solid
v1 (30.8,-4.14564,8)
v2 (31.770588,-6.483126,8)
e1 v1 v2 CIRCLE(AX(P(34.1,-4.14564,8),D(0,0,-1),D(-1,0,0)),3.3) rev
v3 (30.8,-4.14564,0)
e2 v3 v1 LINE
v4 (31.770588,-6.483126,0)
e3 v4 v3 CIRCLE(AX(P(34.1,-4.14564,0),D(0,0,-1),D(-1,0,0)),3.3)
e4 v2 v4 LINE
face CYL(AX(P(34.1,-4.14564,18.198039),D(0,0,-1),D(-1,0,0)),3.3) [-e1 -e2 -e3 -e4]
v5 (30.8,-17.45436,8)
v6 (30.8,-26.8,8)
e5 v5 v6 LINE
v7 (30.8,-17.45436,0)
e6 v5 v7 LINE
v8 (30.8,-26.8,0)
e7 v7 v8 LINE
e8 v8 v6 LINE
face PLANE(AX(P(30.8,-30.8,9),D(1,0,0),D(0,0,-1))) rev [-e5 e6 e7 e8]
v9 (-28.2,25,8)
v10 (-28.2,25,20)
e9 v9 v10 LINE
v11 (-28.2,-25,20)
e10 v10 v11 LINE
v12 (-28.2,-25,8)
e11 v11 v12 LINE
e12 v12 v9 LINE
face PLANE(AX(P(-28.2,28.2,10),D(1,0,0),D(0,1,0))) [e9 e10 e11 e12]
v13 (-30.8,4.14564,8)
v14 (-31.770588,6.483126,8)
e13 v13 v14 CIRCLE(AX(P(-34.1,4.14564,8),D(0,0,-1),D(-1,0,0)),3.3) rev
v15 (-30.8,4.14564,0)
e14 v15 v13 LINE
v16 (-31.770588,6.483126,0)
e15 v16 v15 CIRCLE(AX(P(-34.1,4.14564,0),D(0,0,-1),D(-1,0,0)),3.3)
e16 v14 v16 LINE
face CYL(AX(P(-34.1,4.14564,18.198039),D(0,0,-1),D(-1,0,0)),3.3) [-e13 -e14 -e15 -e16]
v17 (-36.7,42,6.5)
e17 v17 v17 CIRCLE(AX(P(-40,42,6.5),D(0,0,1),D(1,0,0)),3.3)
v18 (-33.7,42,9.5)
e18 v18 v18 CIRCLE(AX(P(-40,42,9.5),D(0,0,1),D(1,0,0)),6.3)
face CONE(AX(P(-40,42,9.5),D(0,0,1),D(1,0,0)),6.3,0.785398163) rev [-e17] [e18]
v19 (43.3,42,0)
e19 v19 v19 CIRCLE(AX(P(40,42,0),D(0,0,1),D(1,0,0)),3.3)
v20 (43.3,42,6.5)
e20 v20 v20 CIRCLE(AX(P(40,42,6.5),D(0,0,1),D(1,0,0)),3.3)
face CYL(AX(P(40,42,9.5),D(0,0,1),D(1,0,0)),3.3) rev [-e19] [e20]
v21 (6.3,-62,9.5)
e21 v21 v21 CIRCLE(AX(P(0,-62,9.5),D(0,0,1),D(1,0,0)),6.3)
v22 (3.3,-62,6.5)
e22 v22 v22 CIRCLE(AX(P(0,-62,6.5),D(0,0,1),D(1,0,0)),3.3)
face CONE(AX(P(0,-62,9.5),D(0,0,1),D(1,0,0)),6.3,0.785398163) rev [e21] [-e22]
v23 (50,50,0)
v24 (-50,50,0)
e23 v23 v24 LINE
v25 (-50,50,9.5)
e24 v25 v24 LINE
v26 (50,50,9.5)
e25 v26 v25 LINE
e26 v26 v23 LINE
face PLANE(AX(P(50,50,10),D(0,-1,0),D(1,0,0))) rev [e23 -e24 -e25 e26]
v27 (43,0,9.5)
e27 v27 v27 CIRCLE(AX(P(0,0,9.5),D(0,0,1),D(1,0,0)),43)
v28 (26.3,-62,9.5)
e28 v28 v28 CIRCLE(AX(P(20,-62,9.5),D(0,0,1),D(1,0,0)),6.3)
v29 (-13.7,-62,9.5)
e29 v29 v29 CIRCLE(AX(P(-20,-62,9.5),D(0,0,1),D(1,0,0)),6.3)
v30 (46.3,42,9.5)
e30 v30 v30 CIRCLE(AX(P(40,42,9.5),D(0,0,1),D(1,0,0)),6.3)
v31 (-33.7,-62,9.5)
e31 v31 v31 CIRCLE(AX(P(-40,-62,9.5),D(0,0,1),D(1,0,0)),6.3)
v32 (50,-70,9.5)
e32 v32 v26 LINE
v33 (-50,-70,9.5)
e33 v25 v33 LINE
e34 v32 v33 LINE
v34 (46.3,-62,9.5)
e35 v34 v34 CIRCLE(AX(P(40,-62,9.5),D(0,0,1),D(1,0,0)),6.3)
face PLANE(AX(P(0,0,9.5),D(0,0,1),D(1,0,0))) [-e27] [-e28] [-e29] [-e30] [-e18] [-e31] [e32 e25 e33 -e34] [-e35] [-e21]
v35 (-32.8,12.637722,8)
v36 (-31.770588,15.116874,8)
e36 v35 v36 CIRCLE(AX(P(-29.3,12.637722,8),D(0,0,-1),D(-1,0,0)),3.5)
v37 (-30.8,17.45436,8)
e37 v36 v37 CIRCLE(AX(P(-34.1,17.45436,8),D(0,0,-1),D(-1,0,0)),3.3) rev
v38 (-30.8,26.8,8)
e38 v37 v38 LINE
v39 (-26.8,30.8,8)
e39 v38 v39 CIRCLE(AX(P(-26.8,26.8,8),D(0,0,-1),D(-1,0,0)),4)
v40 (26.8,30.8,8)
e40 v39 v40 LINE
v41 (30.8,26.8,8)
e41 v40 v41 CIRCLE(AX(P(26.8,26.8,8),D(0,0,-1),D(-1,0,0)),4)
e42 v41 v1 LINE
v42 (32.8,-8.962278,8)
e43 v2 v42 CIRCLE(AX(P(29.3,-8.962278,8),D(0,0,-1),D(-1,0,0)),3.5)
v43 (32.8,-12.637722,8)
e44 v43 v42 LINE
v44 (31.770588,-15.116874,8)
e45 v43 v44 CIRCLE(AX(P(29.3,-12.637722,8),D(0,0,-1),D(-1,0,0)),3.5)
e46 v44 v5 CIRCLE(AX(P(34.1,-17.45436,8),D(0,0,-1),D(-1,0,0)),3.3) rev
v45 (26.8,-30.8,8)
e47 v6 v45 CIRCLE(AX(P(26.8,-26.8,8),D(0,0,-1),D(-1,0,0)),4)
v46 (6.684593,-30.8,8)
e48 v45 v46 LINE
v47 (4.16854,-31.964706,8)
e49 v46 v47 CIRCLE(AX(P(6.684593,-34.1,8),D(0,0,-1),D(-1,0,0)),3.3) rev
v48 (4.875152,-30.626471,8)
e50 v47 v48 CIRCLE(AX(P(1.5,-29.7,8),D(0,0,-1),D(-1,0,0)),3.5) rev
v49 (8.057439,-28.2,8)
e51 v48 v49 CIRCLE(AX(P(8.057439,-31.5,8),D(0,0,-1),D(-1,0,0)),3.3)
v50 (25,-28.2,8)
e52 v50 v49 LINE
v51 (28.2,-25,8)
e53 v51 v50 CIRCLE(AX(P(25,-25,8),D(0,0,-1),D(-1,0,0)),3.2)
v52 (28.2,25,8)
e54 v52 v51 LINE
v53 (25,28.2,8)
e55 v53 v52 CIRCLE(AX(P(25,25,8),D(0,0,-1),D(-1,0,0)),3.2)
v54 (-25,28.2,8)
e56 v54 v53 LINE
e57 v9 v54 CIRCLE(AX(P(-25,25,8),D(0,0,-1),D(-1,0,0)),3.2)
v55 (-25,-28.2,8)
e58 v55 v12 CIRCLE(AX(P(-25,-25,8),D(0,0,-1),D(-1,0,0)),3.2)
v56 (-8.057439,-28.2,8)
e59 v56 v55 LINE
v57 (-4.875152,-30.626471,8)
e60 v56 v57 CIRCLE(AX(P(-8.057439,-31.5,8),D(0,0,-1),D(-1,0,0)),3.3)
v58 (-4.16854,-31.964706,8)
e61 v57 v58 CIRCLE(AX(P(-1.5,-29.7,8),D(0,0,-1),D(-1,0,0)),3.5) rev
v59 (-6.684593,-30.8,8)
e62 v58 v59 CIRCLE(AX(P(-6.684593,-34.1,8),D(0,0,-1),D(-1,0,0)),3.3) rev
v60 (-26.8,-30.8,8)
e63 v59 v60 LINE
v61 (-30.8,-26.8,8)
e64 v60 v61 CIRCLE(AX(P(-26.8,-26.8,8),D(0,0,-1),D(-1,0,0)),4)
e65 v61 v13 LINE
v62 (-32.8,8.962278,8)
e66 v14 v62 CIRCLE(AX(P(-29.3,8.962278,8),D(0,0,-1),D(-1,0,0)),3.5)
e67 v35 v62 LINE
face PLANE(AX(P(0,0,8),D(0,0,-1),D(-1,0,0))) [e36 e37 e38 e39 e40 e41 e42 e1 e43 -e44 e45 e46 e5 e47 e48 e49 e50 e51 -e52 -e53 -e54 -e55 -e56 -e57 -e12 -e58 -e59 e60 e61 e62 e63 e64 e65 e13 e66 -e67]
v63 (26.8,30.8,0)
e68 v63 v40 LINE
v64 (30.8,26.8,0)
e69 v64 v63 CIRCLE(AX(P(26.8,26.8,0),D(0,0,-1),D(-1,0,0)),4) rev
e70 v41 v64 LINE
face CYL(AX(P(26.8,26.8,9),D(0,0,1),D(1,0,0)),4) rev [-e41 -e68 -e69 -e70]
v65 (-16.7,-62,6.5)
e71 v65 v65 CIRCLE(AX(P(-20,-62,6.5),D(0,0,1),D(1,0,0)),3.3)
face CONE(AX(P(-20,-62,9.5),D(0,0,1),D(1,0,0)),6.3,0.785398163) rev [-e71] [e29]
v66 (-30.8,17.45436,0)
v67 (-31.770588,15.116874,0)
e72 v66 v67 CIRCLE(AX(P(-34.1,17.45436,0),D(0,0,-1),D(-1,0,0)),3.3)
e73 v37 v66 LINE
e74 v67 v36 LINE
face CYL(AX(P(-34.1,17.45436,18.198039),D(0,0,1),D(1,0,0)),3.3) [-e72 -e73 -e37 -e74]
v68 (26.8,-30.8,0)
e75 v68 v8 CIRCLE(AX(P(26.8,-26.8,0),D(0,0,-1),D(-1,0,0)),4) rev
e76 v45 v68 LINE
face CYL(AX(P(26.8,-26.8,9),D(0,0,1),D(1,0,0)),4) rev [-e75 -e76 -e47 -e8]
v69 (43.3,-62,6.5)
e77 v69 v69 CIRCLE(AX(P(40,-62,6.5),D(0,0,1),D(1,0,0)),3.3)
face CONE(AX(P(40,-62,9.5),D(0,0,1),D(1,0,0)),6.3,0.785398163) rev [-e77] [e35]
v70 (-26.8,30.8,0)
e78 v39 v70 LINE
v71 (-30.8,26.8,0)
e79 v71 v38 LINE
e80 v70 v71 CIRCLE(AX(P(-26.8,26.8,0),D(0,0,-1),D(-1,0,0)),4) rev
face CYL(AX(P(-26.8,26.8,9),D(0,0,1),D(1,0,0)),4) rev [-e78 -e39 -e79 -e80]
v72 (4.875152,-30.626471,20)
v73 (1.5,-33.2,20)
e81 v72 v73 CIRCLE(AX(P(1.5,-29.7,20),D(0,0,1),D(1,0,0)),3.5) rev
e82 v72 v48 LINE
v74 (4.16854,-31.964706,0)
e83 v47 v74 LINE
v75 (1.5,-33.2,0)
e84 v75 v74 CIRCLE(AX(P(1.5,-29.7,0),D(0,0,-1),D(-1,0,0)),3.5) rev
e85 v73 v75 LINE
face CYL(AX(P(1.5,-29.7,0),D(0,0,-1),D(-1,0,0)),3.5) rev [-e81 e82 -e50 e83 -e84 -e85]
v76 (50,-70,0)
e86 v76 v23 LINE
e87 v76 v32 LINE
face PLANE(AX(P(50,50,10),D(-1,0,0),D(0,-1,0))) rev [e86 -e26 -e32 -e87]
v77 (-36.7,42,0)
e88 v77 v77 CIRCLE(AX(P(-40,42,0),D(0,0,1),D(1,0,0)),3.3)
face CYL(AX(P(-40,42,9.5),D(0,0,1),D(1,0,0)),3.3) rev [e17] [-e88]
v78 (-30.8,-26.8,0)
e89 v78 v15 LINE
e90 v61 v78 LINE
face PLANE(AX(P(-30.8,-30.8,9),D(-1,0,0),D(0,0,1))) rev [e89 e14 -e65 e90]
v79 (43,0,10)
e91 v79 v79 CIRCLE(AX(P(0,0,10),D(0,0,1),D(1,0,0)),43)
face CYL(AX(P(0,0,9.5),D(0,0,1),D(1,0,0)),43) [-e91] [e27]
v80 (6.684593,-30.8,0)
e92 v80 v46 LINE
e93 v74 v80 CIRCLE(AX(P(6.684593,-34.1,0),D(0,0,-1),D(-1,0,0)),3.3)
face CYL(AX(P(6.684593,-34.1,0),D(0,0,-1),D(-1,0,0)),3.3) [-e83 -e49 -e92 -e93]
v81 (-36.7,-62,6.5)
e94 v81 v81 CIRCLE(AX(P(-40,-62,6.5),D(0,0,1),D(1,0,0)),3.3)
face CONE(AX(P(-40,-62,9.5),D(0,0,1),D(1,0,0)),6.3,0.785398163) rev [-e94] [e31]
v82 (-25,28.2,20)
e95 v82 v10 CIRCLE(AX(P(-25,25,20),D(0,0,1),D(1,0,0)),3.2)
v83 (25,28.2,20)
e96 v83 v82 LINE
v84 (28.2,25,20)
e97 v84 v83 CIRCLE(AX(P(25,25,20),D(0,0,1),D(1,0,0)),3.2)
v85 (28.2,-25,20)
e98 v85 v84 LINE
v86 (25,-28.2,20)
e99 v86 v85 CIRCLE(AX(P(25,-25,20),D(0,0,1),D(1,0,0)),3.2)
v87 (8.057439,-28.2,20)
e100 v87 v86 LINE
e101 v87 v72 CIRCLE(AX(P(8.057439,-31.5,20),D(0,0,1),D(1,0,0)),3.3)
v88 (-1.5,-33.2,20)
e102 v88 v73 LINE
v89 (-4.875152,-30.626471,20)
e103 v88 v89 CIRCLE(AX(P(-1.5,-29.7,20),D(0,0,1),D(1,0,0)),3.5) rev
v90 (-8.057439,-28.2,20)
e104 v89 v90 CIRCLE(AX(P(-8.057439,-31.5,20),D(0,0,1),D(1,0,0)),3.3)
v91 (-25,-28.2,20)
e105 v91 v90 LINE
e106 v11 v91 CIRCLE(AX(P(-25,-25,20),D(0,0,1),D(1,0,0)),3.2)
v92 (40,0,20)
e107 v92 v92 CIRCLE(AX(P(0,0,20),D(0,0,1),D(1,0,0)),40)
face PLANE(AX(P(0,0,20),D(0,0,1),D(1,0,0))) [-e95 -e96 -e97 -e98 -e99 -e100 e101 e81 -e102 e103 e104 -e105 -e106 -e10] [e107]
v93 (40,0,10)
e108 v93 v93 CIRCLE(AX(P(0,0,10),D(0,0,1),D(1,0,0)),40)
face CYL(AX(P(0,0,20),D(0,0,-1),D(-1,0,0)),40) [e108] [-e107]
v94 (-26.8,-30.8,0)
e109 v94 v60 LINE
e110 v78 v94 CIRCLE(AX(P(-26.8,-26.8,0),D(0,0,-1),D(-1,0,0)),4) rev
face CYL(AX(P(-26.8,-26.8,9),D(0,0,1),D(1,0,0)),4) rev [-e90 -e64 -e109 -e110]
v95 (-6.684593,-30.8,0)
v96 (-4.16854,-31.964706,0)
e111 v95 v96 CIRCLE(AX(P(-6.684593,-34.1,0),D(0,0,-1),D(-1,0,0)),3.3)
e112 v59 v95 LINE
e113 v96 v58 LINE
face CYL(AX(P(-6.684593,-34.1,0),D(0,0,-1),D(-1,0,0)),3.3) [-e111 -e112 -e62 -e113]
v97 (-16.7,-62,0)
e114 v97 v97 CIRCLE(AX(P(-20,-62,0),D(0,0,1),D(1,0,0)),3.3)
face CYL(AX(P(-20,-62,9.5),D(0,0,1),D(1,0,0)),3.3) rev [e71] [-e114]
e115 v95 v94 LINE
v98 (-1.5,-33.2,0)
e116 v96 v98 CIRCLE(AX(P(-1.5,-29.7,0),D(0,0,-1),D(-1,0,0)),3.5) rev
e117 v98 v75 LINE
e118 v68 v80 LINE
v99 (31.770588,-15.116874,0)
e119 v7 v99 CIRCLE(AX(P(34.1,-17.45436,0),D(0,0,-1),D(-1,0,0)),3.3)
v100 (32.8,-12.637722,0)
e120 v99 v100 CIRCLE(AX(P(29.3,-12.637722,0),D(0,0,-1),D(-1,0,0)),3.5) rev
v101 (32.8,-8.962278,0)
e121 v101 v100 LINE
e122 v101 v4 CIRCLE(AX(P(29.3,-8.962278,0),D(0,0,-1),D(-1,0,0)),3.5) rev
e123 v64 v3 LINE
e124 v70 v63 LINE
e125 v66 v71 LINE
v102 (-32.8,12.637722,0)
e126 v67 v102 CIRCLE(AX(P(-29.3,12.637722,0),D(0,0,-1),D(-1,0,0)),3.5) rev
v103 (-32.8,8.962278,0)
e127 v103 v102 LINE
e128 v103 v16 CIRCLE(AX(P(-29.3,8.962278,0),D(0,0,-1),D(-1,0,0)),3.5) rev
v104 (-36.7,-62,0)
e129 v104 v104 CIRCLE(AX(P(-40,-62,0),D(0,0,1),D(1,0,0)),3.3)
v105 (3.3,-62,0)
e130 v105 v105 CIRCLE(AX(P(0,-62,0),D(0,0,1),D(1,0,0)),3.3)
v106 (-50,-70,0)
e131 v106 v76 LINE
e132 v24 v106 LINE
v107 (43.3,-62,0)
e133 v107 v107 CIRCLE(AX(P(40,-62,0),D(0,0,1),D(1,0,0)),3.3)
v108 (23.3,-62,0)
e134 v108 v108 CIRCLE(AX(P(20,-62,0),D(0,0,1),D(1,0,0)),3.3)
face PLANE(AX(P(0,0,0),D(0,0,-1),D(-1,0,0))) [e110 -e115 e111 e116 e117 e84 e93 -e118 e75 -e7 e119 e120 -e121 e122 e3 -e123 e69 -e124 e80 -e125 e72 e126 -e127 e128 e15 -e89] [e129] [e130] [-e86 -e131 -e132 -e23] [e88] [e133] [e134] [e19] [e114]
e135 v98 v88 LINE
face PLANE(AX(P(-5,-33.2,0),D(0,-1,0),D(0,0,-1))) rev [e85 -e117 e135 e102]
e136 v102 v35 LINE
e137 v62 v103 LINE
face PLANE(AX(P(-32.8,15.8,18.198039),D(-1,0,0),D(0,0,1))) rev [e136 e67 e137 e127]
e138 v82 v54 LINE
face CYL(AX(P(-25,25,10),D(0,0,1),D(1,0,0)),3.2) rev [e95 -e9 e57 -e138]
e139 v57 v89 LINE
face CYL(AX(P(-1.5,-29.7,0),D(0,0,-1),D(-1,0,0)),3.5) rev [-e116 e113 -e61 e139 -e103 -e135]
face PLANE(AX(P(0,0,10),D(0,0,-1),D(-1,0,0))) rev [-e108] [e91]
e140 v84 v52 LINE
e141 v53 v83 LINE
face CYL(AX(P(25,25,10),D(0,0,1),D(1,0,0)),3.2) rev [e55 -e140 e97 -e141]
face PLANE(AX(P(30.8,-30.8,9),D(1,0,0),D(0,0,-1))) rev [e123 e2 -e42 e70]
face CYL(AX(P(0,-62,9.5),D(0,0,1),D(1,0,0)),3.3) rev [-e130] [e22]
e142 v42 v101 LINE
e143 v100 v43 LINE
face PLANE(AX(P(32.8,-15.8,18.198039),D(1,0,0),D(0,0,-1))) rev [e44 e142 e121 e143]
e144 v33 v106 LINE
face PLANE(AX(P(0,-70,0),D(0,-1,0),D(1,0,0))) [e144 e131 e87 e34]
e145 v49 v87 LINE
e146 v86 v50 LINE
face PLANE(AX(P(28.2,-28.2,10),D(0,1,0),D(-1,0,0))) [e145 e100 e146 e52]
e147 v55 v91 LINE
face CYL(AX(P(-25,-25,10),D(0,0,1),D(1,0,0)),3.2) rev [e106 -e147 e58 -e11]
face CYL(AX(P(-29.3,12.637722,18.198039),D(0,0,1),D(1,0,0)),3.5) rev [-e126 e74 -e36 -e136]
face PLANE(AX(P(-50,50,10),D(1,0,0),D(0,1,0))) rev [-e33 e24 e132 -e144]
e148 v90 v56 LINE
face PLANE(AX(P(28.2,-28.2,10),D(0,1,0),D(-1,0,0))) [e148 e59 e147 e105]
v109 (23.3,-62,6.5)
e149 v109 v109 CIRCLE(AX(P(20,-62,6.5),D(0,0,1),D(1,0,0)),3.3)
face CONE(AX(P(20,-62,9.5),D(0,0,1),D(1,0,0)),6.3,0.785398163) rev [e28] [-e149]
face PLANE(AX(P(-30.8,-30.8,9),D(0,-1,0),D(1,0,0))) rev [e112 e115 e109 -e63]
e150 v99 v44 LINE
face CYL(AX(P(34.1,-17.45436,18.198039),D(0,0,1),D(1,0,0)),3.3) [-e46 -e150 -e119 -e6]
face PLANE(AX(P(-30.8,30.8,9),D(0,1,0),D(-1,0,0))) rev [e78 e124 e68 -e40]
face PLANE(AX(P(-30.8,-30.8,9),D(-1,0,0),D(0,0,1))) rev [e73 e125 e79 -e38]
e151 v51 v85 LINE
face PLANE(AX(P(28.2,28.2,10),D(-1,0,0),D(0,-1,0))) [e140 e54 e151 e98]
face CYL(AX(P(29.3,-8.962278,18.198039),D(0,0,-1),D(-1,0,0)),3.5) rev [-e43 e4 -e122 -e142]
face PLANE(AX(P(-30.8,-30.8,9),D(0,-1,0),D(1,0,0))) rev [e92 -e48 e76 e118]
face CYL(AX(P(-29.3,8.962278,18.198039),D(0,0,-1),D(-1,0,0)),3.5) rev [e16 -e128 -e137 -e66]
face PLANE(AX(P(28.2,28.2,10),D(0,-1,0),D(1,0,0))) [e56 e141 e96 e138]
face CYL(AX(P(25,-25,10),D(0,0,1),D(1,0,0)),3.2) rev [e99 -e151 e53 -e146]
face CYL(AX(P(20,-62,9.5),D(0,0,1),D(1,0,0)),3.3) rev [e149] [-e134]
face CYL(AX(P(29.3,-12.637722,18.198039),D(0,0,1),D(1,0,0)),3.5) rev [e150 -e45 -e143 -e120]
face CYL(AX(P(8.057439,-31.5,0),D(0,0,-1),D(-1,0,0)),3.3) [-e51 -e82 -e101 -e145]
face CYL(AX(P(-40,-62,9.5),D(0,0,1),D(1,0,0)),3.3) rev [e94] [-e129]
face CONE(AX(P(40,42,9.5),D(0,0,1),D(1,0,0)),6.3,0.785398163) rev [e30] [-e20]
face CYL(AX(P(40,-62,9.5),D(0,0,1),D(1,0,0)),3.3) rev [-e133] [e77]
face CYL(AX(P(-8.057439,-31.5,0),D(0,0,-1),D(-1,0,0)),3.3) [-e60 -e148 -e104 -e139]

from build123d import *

# Parameters (mm, degrees)
ESQUISSE1_W                                    = 100
ESQUISSE1_H                                    = 100
ESQUISSE1_W_2                                  = 56.4
ESQUISSE1_H_2                                  = 56.4
BOSS_EXTRU_1_DEPTH                             = 10
CONG_1_R                                       = 3.2
BOSS_EXTRU_2_START                             = 10
ESQUISSE3_R                                    = 40
BOSS_EXTRU_2_DEPTH                             = 10
ESQUISSE4_OUTSIDE_W                            = 130.566
ESQUISSE4_OUTSIDE_H                            = 130.566
ESQUISSE4_OUTSIDE_R                            = 43
ENL_V_MAT_EXTRU_2_DEPTH                        = 0.5
ESQUISSE5_W                                    = 61.6
ESQUISSE5_H                                    = 61.6
ENL_V_MAT_EXTRU_3_DEPTH                        = 9
ESQUISSE6_W                                    = 61.6
ESQUISSE6_H                                    = 61.6
BOSS_EXTRU_3_DEPTH                             = 1
ESQUISSE12_W                                   = 100
ESQUISSE12_H                                   = 9.5
BOSS_EXTRU_5_DEPTH                             = 20
FRAISAGE_POUR_VIS_T_TE_FRAIS_E_M61_D           = 6.6
FRAISAGE_POUR_VIS_T_TE_FRAIS_E_M61_CSINK_D     = 12.6
FRAISAGE_POUR_VIS_T_TE_FRAIS_E_M61_CSINK_ANGLE = 90
ESQUISSE16_W                                   = 2
ESQUISSE16_H                                   = 10
ENL_V_MAT_EXTRU_4_DEPTH                        = 8
CONG_3_R                                       = 3.5
ESQUISSE17_W                                   = 10
ESQUISSE17_H                                   = 5
ENL_V_MAT_EXTRU_5_DEPTH                        = 89.317608663
CONG_4_R                                       = 3.5
CONG_5_R                                       = 3.3
CONG_6_R                                       = 4


with BuildPart() as part:
    # Esquisse1 → Boss.-Extru.1 (new body)
    with BuildSketch(Plane.XY):
        Rectangle(ESQUISSE1_W, ESQUISSE1_H)
        Rectangle(ESQUISSE1_W_2, ESQUISSE1_H_2, mode=Mode.SUBTRACT)
    extrude(amount=BOSS_EXTRU_1_DEPTH)

    # Congé1
    cong_1_edges = [part.edges().sort_by_distance(p)[0] for p in [
        (-28.2, 28.2, 5),
        (-28.2, -28.2, 5),
        (28.2, -28.2, 5),
        (28.2, 28.2, 5),
    ]]
    fillet(cong_1_edges, radius=CONG_1_R)

    # Esquisse3 → Boss.-Extru.2 (add)
    with BuildSketch(Plane.XY.offset(10).offset(BOSS_EXTRU_2_START)):
        Circle(ESQUISSE3_R)
        with BuildLine():
            Line((-28.2, 25), (-28.2, -25))
            ThreePointArc((-28.2, -25), (-27.2627417, -27.2627417), (-25, -28.2))
            Line((-25, -28.2), (25, -28.2))
            ThreePointArc((25, -28.2), (27.2627417, -27.2627417), (28.2, -25))
            Line((28.2, -25), (28.2, 25))
            ThreePointArc((28.2, 25), (27.2627417, 27.2627417), (25, 28.2))
            Line((25, 28.2), (-25, 28.2))
            ThreePointArc((-25, 28.2), (-27.2627417, 27.2627417), (-28.2, 25))
        make_face(mode=Mode.SUBTRACT)
    extrude(amount=-BOSS_EXTRU_2_DEPTH)

    # Esquisse4 outside → Enlèv. mat.-Extru.2 (cut)
    with BuildSketch(Plane.XY.offset(10)):
        Rectangle(ESQUISSE4_OUTSIDE_W, ESQUISSE4_OUTSIDE_H)
        Circle(ESQUISSE4_OUTSIDE_R, mode=Mode.SUBTRACT)
    extrude(amount=-ENL_V_MAT_EXTRU_2_DEPTH, mode=Mode.SUBTRACT)

    # Esquisse5 → Enlèv. mat.-Extru.3 (cut)
    with BuildSketch(Plane(origin=(0, 0, 0), x_dir=(-1, 0, 0), z_dir=(0, 0, -1))):
        Rectangle(ESQUISSE5_W, ESQUISSE5_H)
    extrude(amount=-ENL_V_MAT_EXTRU_3_DEPTH, mode=Mode.SUBTRACT)

    # Esquisse6 → Boss.-Extru.3 (add)
    with BuildSketch(Plane(origin=(0, 0, 9), x_dir=(-1, 0, 0), z_dir=(0, 0, -1))):
        Rectangle(ESQUISSE6_W, ESQUISSE6_H)
        with BuildLine():
            Line((28.2, -25), (28.2, 25))
            ThreePointArc((28.2, 25), (27.2627417, 27.2627417), (25, 28.2))
            Line((25, 28.2), (-25, 28.2))
            ThreePointArc((-25, 28.2), (-27.2627417, 27.2627417), (-28.2, 25))
            Line((-28.2, 25), (-28.2, -25))
            ThreePointArc((-28.2, -25), (-27.2627417, -27.2627417), (-25, -28.2))
            Line((-25, -28.2), (25, -28.2))
            ThreePointArc((25, -28.2), (27.2627417, -27.2627417), (28.2, -25))
        make_face(mode=Mode.SUBTRACT)
    extrude(amount=BOSS_EXTRU_3_DEPTH)

    # Esquisse12 → Boss.-Extru.5 (add)
    with BuildSketch(Plane.XZ.offset(50)):
        with Locations((0, 4.75)):
            Rectangle(ESQUISSE12_W, ESQUISSE12_H)
    extrude(amount=BOSS_EXTRU_5_DEPTH)

    # Fraisage pour vis à tête fraisée M61 (through all)
    with Locations(Plane(origin=(-40, -62, 9.5), x_dir=(1, 0, 0), z_dir=(0, 0, 1))):
        with Locations((0, 0), (20, 0), (40, 0), (60, 0), (80, 0), (0, 104), (80, 104)):
            CounterSinkHole(FRAISAGE_POUR_VIS_T_TE_FRAIS_E_M61_D / 2, FRAISAGE_POUR_VIS_T_TE_FRAIS_E_M61_CSINK_D / 2, counter_sink_angle=FRAISAGE_POUR_VIS_T_TE_FRAIS_E_M61_CSINK_ANGLE)

    # Esquisse16 → Enlèv. mat.-Extru.4 (cut)
    with BuildSketch(Plane(origin=(0, 0, 0), x_dir=(-1, 0, 0), z_dir=(0, 0, -1))):
        with Locations((31.8, 10.8)):
            Rectangle(ESQUISSE16_W, ESQUISSE16_H)
        with Locations((-31.8, -10.8)):
            Rectangle(ESQUISSE16_W, ESQUISSE16_H)
    extrude(amount=-ENL_V_MAT_EXTRU_4_DEPTH, mode=Mode.SUBTRACT)

    # Congé3
    # the kernel refuses this fillet: 3.5 mm, written as the material it adds along each edge
    with BuildSketch(Plane(origin=(32.8, -5.8, 0), x_dir=(-1, 0, 0), z_dir=(0, 0, 1)), Plane(origin=(-32.8, 5.8, 0), x_dir=(1, 0, 0), z_dir=(0, 0, 1))) as cong_3_piece_1:
        with BuildLine():
            CenterArc((3.5, 3.16227766), CONG_3_R, 180, 64.623066475)
            Line((0, 3.16227766), (-0.07, 3.16227766))
            Line((-0.07, 3.16227766), (-0.07, 0))
            Line((-0.07, 0), (0, -0.07))
            ThreePointArc((0, -0.07), (1, -0.07), (1.97, -0.063245553))
            Line((1.97, -0.063245553), (2, 0))
        make_face()
    extrude(amount=15.90569415)
    with BuildSketch(Plane(origin=(32.8, -15.8, 0), x_dir=(-1, 0, 0), z_dir=(0, 0, 1)), Plane(origin=(-32.8, 15.8, 0), x_dir=(1, 0, 0), z_dir=(0, 0, 1))) as cong_3_piece_2:
        with BuildLine():
            CenterArc((3.5, -3.16227766), CONG_3_R, 115.376933525, 64.623066475)
            Line((0, -3.16227766), (-0.07, -3.16227766))
            Line((-0.07, -3.16227766), (-0.07, 0))
            Line((-0.07, 0), (0, 0.07))
            ThreePointArc((0, 0.07), (1, 0.07), (1.97, 0.063245553))
            Line((1.97, 0.063245553), (2, 0))
        make_face()
    extrude(amount=15.90569415)

    # Esquisse17 → Enlèv. mat.-Extru.5 (cut, through all)
    with BuildSketch(Plane.XY.offset(20)):
        with Locations((0, -30.7)):
            Rectangle(ESQUISSE17_W, ESQUISSE17_H)
    extrude(amount=-ENL_V_MAT_EXTRU_5_DEPTH, mode=Mode.SUBTRACT)

    # Congé4
    cong_4_edges = [part.edges().sort_by_distance(p)[0] for p in [
        (5, -33.2, 10),
        (-5, -33.2, 10),
    ]]
    fillet(cong_4_edges, radius=CONG_4_R)

    # Congé5
    # the kernel refuses this fillet: 3.3 mm, written as the material it takes off along each edge
    with BuildSketch(Plane(origin=(-30.8, 5.8, -4.135900428), x_dir=(0, -1, 0), z_dir=(0, 0, 1))) as cong_5_piece_1:
        with BuildLine():
            CenterArc((1.654360171, -3.3), CONG_5_R, 90, 45.099127844)
            ThreePointArc((-0.683125835, -0.970588235), (-0.300120774, -0.514462201), (0, 0))
            Line((0, 0), (1.654360171, 0))
        make_face()
    extrude(amount=12.135900428, mode=Mode.SUBTRACT)
    with BuildSketch(Plane(origin=(-30.8, 15.8, -4.135900428), x_dir=(0, 1, 0), z_dir=(0, 0, 1)), Plane(origin=(30.8, -15.8, -4.135900428), x_dir=(0, -1, 0), z_dir=(0, 0, 1))) as cong_5_piece_2:
        with BuildLine():
            CenterArc((1.654360171, 3.3), CONG_5_R, 224.900872156, 45.099127844)
            ThreePointArc((-0.683125835, 0.970588235), (-0.300120774, 0.514462201), (0, 0))
            Line((0, 0), (1.654360171, 0))
        make_face()
    extrude(amount=12.135900428, mode=Mode.SUBTRACT)
    with BuildSketch(Plane(origin=(30.8, -5.8, -4.135900428), x_dir=(0.8177591102711759, -0.5755606289249594, 0), z_dir=(0, 0, 1))) as cong_5_piece_3:
        with BuildLine():
            CenterArc((1.746420483, 3.252218177), CONG_5_R, 215.138902841, 45.099127844)
            Line((-0.952184581, 1.352868102), (0, 0))
            ThreePointArc((0, 0), (0.593443854, 0.050677691), (1.186887707, 0))
        make_face()
    extrude(amount=12.135900428, mode=Mode.SUBTRACT)
    with BuildSketch(Plane(origin=(5, -28.2, 27.643596311), x_dir=(-0.0513844627897584, -0.9986789458999363, 0), z_dir=(0, 0, -1))) as cong_5_piece_4:
        with BuildLine():
            CenterArc((3.138535685, -3.22296821), CONG_5_R, 102.404067037, 74.650522983)
            Line((-0.157104836, -3.053399483), (-0.486668888, -3.03644261))
            Line((-0.486668888, -3.03644261), (-0.329564052, 0.016956873))
            Line((-0.329564052, 0.016956873), (0.016956873, 0.329564052))
            ThreePointArc((0.016956873, 0.329564052), (1.514975292, 0.252487358), (2.358794792, 0.322296821))
            Line((2.358794792, 0.322296821), (2.429680327, 0))
        make_face()
    extrude(amount=27.287192622, mode=Mode.SUBTRACT)
    with BuildSketch(Plane(origin=(-5, -28.2, 27.643596311), x_dir=(0.05138446278975914, -0.9986789458999363, 0), z_dir=(0, 0, -1))) as cong_5_piece_5:
        with BuildLine():
            CenterArc((3.138535685, 3.22296821), CONG_5_R, 182.94540998, 74.650522983)
            Line((-0.157104836, 3.053399483), (-0.486668888, 3.03644261))
            Line((-0.486668888, 3.03644261), (-0.329564052, -0.016956873))
            Line((-0.329564052, -0.016956873), (0.016956873, -0.329564052))
            ThreePointArc((0.016956873, -0.329564052), (1.514975292, -0.252487358), (2.358794792, -0.322296821))
            Line((2.358794792, -0.322296821), (2.429680327, 0))
        make_face()
    extrude(amount=27.287192622, mode=Mode.SUBTRACT)
    with BuildSketch(Plane(origin=(4.822649545, -30.8, 8), x_dir=(1, 0, 0), z_dir=(0, 0, -1))) as cong_5_piece_6:
        with BuildLine():
            CenterArc((1.861943014, 3.3), CONG_5_R, 220.32021507, 49.67978493)
            ThreePointArc((-0.654109258, 1.164705882), (-0.270973964, 0.613848345), (0, 0))
            Line((0, 0), (1.861943014, 0))
        make_face()
    extrude(amount=12.654857534, mode=Mode.SUBTRACT)
    with BuildSketch(Plane(origin=(-4.822649545, -30.8, -4.654857534), x_dir=(0.4896709556510413, -0.8719073088303573, 0), z_dir=(0, 0, 1))) as cong_5_piece_7:
        with BuildLine():
            CenterArc((1.965554704, -3.239355876), CONG_5_R, 101.001258329, 49.67978493)
            Line((-0.911739415, -1.623441722), (0, 0))
            ThreePointArc((0, 0), (0.667906938, -0.064319526), (1.335813877, 0))
        make_face()
    extrude(amount=12.654857534, mode=Mode.SUBTRACT)

    # Congé6
    cong_6_edges = [part.edges().sort_by_distance(p)[0] for p in [
        (-30.8, -30.8, 4),
        (30.8, -30.8, 4),
        (-30.8, 30.8, 4),
        (30.8, 30.8, 4),
    ]]
    fillet(cong_6_edges, radius=CONG_6_R)


solid = part.part
